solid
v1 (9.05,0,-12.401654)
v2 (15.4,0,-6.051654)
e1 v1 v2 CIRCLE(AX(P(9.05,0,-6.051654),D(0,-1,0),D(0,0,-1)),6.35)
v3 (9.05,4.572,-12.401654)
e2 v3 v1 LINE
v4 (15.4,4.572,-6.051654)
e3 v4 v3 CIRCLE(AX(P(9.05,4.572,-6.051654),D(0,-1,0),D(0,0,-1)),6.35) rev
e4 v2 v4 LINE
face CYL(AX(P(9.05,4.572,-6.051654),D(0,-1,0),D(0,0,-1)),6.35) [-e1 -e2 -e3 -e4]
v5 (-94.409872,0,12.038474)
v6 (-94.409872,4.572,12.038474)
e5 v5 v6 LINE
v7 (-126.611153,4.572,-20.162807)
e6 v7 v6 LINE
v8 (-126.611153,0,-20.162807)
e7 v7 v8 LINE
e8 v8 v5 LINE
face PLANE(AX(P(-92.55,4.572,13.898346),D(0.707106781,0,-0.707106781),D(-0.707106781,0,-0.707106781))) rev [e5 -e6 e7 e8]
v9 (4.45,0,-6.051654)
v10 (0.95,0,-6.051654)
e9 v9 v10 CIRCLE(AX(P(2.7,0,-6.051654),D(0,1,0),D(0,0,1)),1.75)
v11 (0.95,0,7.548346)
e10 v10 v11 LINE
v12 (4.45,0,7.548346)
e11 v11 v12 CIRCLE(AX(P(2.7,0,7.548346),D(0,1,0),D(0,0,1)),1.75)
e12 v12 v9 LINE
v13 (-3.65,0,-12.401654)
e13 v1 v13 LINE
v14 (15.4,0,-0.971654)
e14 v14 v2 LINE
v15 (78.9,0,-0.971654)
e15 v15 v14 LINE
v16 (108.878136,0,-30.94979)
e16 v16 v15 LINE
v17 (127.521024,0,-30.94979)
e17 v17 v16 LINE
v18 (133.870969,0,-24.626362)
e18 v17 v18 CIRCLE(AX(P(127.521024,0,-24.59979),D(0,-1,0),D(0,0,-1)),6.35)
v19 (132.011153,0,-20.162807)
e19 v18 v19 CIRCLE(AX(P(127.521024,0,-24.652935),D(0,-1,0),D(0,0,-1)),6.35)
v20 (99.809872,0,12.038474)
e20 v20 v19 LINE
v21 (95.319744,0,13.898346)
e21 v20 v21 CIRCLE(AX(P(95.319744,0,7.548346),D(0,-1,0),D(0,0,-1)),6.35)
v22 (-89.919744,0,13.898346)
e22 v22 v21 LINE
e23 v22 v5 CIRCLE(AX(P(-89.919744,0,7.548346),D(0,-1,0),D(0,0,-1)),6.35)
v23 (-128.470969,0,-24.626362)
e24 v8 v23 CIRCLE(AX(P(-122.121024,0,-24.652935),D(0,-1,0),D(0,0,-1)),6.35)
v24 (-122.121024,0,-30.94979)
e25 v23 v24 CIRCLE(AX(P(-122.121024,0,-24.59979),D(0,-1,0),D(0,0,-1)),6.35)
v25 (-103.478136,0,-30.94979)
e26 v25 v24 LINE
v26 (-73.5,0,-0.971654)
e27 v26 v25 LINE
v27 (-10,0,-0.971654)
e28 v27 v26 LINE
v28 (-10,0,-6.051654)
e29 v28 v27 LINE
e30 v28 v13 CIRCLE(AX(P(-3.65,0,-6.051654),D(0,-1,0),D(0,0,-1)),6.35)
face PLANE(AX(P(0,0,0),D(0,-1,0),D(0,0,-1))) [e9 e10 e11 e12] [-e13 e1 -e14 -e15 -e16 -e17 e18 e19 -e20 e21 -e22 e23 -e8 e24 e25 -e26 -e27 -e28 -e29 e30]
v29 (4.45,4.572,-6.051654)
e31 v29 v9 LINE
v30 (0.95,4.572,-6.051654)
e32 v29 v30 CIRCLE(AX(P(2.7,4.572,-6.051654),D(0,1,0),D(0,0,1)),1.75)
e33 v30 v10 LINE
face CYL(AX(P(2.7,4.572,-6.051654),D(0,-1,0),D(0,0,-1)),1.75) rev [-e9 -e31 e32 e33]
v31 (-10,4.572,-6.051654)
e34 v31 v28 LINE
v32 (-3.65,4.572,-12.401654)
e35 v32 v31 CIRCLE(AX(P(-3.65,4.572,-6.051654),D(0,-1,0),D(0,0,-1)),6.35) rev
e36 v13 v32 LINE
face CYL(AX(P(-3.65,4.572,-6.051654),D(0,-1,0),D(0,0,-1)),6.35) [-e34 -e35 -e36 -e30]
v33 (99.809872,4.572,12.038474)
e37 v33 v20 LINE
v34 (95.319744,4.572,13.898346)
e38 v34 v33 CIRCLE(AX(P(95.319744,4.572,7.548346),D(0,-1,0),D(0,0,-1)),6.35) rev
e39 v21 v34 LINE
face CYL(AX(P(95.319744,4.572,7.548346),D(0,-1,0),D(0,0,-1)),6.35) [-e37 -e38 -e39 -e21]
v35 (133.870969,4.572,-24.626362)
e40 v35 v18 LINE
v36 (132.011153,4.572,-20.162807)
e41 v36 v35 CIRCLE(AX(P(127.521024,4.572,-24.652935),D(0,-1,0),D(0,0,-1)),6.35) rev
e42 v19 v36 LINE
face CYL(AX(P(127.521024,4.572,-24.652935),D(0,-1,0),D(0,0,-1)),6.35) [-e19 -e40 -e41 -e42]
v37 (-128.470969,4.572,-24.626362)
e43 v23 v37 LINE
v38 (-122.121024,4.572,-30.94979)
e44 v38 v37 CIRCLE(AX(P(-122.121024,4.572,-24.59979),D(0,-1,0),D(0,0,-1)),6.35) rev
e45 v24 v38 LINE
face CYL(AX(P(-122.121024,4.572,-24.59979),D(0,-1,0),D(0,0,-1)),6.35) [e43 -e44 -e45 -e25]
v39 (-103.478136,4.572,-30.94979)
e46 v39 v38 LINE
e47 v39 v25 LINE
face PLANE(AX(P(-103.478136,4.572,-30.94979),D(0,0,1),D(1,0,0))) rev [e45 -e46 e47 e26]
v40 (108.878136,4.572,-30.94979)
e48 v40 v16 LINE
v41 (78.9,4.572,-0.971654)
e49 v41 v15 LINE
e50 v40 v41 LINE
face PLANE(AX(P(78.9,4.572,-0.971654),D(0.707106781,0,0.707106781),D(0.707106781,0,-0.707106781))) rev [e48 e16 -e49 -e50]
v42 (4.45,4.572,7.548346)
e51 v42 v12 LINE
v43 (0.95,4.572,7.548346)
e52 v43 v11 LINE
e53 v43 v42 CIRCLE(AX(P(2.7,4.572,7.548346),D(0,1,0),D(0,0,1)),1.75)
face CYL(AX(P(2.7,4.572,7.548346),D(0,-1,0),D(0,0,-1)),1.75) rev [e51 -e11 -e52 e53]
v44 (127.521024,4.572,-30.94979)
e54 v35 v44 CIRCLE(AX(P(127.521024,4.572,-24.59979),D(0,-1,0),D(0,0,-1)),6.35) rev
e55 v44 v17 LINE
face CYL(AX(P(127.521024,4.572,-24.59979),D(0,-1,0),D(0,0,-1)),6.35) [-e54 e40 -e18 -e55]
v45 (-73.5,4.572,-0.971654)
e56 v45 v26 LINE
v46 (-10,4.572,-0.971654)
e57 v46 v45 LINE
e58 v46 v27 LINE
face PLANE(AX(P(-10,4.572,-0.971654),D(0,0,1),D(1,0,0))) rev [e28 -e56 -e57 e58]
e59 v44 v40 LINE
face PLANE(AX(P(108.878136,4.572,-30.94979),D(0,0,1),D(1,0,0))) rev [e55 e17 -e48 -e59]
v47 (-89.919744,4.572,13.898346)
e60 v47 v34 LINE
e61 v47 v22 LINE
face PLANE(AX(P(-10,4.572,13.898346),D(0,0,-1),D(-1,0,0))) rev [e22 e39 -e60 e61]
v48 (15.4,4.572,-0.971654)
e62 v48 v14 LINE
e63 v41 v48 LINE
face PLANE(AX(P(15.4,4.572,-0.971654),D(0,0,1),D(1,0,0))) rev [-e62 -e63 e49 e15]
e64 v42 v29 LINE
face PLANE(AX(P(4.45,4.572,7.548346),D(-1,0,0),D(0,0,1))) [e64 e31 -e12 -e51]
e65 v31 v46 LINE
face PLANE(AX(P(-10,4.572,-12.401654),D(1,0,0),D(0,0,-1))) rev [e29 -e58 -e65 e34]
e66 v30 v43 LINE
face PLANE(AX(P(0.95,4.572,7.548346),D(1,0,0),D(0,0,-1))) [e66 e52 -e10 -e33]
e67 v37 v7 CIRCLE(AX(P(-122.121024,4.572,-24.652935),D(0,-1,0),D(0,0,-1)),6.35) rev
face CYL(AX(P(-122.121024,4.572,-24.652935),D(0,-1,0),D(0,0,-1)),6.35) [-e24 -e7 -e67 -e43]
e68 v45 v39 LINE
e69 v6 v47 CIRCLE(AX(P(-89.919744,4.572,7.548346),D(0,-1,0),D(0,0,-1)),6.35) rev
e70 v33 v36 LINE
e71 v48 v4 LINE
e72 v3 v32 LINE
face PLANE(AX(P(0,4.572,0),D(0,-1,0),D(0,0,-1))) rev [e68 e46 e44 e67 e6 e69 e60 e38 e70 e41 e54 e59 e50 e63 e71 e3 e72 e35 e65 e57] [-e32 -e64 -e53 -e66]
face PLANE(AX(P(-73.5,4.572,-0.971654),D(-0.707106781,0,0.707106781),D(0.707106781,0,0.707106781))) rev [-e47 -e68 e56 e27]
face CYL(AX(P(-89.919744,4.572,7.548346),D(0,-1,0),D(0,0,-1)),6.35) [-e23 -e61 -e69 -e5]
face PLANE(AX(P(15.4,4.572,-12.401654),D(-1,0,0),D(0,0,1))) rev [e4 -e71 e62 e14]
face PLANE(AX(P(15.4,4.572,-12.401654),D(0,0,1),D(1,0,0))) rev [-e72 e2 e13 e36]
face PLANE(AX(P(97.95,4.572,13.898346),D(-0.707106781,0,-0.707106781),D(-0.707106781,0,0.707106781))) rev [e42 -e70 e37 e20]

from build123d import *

# Parameters (mm, degrees)
BOSS_EXTRUDE1_DEPTH = 4.572
FILLET3_R           = 6.35
FILLET2_R           = 6.35


with BuildPart() as part:
    # Sketch1 → Boss-Extrude1 (new body)
    with BuildSketch(Plane(origin=(0, 0, 0), x_dir=(1, 0, 0), z_dir=(0, 1, 0))):
        Polygon((15.4, 12.401654114), (15.4, 0.971654114), (78.9, 0.971654114), (108.87813576, 30.949789874), (133.871024484, 30.949789874), (133.871024484, 22.022678598), (97.95, -13.898345886), (15.4, -13.898345886), (-10, -13.898345886), (-92.55, -13.898345886), (-128.471024484, 22.022678598), (-128.471024484, 30.949789874), (-103.47813576, 30.949789874), (-73.5, 0.971654114), (-10, 0.971654114), (-10, 12.401654114), align=None)
        with BuildLine():
            Line((0.95, -7.548345886), (0.95, 6.051654114))
            ThreePointArc((0.95, 6.051654114), (2.7, 7.801654114), (4.45, 6.051654114))
            Line((4.45, 6.051654114), (4.45, -7.548345886))
            ThreePointArc((4.45, -7.548345886), (2.7, -9.298345886), (0.95, -7.548345886))
        make_face(mode=Mode.SUBTRACT)
    extrude(amount=BOSS_EXTRUDE1_DEPTH)

    # Fillet3
    # the kernel refuses this fillet: 6.35 mm, written as the material it takes off along each edge
    with BuildSketch(Plane(origin=(133.871024484, -15.875, -30.949789874), x_dir=(0, 0, 1), z_dir=(0, 1, 0)), Plane(origin=(-128.471024484, -15.875, -30.949789874), x_dir=(1, 0, 0), z_dir=(0, 1, 0))) as fillet3_piece_1:
        with BuildLine():
            CenterArc((FILLET3_R, -FILLET3_R), FILLET3_R, 90, 90)
            Line((0, -FILLET3_R), (0, 0))
            Line((0, 0), (FILLET3_R, 0))
        make_face()
    extrude(amount=36.322, mode=Mode.SUBTRACT)
    with BuildSketch(Plane(origin=(-128.471024484, -6.575640303, -22.022678598), x_dir=(0, 0, -1), z_dir=(0, 1, 0)), Plane(origin=(133.871024484, -6.575640303, -22.022678598), x_dir=(-0.7071067811865476, 0, 0.7071067811865476), z_dir=(0, 1, 0)), Plane(origin=(97.95, -6.575640303, 13.898345886), x_dir=(-1, 0, 0), z_dir=(0, 1, 0)), Plane(origin=(-92.55, -6.575640303, 13.898345886), x_dir=(-0.7071067811865476, 0, -0.7071067811865476), z_dir=(0, 1, 0))) as fillet3_piece_2:
        with BuildLine():
            CenterArc((FILLET3_R * 0.414213562373, -FILLET3_R), FILLET3_R, 90, 45)
            Line((-FILLET3_R * 0.292893218813, -FILLET3_R * 0.292893218813), (0, 0))
            Line((0, 0), (FILLET3_R * 0.414213562373, 0))
        make_face()
    extrude(amount=17.723280605, mode=Mode.SUBTRACT)

    # Fillet2
    fillet2_edges = [part.edges().sort_by_distance(p)[0] for p in [
        (-10, 2.286, -12.401654114),
        (15.4, 2.286, -12.401654114),
    ]]
    fillet(fillet2_edges, radius=FILLET2_R)


solid = part.part
